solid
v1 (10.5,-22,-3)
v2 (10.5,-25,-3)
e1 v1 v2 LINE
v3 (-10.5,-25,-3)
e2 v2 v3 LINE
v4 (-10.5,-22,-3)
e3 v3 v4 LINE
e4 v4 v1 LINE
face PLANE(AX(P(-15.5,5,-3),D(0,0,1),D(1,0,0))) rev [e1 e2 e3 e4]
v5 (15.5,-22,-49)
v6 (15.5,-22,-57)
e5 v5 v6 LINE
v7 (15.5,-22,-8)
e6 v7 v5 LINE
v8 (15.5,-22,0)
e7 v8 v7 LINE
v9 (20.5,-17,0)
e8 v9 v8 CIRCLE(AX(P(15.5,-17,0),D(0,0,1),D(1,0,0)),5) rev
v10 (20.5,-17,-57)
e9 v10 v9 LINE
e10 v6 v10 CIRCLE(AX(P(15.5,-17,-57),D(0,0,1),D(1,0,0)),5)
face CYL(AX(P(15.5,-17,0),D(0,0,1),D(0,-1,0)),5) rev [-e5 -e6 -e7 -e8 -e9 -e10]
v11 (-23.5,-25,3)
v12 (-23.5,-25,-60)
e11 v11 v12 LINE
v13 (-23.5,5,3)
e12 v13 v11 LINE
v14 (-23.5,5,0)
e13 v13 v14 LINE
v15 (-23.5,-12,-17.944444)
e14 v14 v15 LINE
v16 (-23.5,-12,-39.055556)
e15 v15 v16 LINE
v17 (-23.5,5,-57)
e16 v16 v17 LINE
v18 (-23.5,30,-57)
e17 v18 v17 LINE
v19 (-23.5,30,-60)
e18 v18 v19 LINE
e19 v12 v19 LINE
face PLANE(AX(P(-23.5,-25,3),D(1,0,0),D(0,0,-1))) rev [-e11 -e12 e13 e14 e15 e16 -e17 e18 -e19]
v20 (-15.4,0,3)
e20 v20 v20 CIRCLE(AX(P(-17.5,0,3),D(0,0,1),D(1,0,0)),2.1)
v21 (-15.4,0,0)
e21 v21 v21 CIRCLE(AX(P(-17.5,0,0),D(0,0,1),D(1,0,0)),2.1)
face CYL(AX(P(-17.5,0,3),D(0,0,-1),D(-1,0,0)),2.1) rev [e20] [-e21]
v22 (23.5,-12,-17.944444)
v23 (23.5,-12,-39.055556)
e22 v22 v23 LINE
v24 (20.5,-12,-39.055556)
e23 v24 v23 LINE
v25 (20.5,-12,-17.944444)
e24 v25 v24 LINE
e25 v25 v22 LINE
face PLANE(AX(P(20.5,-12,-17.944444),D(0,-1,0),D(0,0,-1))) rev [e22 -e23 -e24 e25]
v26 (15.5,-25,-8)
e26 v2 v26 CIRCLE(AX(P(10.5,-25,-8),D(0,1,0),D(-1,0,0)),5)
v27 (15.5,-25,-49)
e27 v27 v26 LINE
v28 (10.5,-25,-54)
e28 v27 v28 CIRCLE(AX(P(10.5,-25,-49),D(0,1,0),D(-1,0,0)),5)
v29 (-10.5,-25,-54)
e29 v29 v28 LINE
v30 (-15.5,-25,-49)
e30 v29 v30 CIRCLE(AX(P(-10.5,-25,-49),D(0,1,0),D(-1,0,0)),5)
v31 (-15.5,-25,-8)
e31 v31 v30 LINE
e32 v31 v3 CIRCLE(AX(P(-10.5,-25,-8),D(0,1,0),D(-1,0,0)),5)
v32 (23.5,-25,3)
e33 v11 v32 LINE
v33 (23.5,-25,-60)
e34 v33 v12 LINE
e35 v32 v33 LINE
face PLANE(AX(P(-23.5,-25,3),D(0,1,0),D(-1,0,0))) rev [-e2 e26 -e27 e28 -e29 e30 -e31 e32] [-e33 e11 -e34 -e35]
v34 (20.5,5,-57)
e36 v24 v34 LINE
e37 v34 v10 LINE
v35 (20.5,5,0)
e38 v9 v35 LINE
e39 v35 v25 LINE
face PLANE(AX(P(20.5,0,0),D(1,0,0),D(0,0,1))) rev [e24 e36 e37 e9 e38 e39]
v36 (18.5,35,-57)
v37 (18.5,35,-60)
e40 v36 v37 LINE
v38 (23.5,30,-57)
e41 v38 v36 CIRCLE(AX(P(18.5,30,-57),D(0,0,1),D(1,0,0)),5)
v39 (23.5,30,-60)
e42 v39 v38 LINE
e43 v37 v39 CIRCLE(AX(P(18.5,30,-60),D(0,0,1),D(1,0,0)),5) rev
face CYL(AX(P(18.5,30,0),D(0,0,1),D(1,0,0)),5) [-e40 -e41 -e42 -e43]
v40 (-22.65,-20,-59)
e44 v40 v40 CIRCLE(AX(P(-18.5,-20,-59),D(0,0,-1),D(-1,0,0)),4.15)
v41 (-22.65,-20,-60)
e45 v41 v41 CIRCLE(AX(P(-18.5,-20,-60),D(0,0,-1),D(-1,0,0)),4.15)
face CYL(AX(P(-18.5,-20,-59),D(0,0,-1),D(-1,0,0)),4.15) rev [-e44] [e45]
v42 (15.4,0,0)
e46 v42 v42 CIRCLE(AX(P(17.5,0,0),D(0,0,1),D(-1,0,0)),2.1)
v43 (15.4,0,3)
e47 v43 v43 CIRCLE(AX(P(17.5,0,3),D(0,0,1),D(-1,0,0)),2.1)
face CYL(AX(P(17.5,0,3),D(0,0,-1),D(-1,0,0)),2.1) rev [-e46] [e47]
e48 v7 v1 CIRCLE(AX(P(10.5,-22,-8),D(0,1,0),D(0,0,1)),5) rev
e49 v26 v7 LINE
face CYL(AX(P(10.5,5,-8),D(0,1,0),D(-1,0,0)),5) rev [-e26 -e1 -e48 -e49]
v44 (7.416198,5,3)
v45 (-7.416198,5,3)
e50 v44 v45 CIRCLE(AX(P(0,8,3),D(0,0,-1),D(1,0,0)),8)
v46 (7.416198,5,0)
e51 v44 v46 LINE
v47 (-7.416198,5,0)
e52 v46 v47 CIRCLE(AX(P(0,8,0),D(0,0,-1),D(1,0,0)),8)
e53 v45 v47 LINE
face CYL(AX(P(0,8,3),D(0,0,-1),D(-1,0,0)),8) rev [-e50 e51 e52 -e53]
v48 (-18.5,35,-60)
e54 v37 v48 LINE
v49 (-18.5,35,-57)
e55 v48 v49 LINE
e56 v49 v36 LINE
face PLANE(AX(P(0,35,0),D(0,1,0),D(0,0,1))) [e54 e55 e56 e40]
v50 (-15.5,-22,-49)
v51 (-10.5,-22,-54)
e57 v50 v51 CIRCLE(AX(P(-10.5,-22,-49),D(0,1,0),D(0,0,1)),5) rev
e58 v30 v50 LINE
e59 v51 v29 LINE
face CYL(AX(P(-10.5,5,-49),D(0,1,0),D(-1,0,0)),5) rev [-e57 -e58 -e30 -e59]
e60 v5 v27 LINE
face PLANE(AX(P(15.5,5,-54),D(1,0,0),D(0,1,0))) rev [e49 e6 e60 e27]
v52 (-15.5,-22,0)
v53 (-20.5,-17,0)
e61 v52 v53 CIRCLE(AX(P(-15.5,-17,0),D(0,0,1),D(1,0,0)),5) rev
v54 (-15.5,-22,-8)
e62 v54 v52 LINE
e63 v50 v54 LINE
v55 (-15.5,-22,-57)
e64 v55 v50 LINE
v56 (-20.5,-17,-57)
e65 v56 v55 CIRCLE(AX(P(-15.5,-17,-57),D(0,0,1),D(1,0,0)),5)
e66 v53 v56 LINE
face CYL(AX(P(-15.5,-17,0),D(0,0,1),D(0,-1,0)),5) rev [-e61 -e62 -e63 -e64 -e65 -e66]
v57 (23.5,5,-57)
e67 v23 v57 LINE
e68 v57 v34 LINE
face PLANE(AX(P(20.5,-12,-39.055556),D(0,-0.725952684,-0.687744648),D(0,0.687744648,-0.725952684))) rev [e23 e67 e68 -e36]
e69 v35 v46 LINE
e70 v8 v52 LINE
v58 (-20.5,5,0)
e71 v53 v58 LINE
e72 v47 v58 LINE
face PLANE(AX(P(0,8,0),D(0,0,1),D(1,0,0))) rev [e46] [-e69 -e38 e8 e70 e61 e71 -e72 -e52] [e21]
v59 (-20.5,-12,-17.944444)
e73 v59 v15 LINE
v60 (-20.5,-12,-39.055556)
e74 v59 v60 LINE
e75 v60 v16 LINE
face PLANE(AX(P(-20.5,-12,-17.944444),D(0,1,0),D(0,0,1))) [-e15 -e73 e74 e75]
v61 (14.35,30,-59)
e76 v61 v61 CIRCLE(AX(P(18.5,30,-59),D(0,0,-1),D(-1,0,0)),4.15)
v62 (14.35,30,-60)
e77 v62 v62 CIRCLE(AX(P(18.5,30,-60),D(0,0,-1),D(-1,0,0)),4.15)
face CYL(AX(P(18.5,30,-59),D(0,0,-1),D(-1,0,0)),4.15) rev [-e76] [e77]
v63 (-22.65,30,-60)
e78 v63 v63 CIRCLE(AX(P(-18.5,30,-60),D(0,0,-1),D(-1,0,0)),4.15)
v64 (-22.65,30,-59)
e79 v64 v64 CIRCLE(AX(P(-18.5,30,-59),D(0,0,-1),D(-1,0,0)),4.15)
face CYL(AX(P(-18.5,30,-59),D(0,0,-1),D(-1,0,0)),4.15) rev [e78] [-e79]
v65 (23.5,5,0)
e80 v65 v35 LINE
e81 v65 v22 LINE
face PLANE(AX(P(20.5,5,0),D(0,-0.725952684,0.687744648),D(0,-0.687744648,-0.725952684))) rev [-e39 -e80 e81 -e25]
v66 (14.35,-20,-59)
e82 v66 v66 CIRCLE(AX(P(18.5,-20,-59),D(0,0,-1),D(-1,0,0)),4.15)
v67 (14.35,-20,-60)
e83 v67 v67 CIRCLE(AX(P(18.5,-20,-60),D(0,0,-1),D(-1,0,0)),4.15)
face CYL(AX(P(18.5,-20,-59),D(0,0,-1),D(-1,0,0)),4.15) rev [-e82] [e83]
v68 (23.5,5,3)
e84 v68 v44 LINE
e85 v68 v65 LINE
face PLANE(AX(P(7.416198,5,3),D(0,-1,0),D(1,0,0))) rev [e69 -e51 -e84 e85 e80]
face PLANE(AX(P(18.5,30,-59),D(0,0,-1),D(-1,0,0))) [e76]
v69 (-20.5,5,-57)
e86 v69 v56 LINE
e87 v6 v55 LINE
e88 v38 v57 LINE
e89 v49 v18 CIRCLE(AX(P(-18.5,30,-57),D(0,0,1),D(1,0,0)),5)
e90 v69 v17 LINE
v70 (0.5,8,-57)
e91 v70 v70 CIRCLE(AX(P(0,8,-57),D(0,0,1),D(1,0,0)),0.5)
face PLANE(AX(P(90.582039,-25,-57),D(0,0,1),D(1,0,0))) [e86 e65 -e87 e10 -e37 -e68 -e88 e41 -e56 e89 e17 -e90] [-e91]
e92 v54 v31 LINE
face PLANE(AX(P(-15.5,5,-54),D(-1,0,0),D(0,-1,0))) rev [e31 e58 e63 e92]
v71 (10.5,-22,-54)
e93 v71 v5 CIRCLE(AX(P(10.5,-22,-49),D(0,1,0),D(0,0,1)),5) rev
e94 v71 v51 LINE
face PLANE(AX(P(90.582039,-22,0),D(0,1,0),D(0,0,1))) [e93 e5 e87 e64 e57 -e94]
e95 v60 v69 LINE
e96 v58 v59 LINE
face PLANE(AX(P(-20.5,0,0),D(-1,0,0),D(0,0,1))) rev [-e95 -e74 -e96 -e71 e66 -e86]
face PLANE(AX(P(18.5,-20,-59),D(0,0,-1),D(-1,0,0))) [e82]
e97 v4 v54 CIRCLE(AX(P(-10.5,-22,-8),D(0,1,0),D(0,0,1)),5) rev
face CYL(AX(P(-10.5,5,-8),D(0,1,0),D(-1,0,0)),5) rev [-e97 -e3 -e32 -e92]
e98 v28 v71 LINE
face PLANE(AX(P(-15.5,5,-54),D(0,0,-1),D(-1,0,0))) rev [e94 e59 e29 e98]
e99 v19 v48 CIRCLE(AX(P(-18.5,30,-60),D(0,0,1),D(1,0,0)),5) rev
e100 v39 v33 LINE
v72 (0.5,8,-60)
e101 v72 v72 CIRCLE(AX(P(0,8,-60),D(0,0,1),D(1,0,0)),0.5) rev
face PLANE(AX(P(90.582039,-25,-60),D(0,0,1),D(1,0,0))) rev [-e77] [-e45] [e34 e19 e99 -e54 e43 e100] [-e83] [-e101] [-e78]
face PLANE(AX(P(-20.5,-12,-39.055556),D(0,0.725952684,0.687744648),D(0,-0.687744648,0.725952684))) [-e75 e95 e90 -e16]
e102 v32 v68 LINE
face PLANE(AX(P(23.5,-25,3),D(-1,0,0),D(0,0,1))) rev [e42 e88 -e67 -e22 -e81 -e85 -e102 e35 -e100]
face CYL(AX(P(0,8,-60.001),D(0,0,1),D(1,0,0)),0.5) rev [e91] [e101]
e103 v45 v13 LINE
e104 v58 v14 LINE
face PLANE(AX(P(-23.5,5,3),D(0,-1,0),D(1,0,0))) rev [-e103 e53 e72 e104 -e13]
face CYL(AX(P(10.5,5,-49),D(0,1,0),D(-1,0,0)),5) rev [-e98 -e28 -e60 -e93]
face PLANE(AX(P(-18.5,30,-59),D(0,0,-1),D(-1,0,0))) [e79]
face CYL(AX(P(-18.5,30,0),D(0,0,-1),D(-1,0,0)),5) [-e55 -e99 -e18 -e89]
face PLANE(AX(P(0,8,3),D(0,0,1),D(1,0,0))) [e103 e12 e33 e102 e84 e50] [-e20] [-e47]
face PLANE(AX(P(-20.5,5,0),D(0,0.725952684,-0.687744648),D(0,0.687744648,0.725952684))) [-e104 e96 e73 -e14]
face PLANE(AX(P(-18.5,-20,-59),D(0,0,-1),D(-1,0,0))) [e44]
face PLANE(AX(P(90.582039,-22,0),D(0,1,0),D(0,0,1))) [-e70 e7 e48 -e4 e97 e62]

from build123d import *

# Parameters (mm, degrees)
SKETCH1_R           = 2.1
BOSS_EXTRUDE1_DEPTH = 3
EXTRUDE_THIN1_DEPTH = 47
BOSS_EXTRUDE2_DEPTH = 3
SKETCH4_W           = 31
SKETCH4_H           = 51
CUT_EXTRUDE1_DEPTH  = 72.0791812
FILLET3_R           = 5
BOSS_EXTRUDE3_DEPTH = 30
FILLET1_R           = 5
CUT_EXTRUDE3_REACH  = 75.33
SKETCH10_R          = 0.5
SKETCH11_R          = 4.15
CUT_EXTRUDE4_DEPTH  = 1
FILLET2_R           = 5


with BuildPart() as part:
    # Sketch1 → Boss-Extrude1 (new body)
    with BuildSketch(Plane.XY):
        with BuildLine():
            Line((7.416198487, 5), (23.5, 5))
            Line((23.5, 5), (23.5, -25))
            Line((23.5, -25), (-23.5, -25))
            Line((-23.5, -25), (-23.5, 5))
            Line((-23.5, 5), (-7.416198487, 5))
            ThreePointArc((-7.416198487, 5), (0, 0), (7.416198487, 5))
        make_face()
        with Locations((-17.5, 0)):
            Circle(SKETCH1_R, mode=Mode.SUBTRACT)
        with Locations(Location((17.5, 0, 0), (0, 0, 180))):
            Circle(SKETCH1_R, mode=Mode.SUBTRACT)
    extrude(amount=BOSS_EXTRUDE1_DEPTH)

    # Sketch2 → Extrude-Thin1 (add)
    with BuildSketch(Plane.ZY.offset(23.5)):
        Polygon((0, -25), (-60, -25), (-60, 5), (-57, 5), (-57, -22), (0, -22), align=None)
    extrude(amount=-EXTRUDE_THIN1_DEPTH)

    # Sketch3 → Boss-Extrude2 (add)
    with BuildSketch(Plane.ZY.offset(23.5)):
        Polygon((-57, 5), (-57, -22), (0, -22), (0, 5), (-17.944444444, -12), (-39.055555556, -12), align=None)
    boss_extrude2 = extrude(amount=-BOSS_EXTRUDE2_DEPTH)

    # Mirror1: Boss-Extrude2 across plane
    add(boss_extrude2.mirror(Plane(origin=(0, 0, 0), x_dir=(0, 0, 1), z_dir=(1, 0, 0))))

    # Sketch4 → Cut-Extrude1 (cut, through all)
    with BuildSketch(Plane.XZ.offset(25)):
        with Locations((0, -28.5)):
            Rectangle(SKETCH4_W, SKETCH4_H)
    extrude(amount=-CUT_EXTRUDE1_DEPTH, mode=Mode.SUBTRACT)

    # Fillet3
    fillet3_edges = [part.edges().sort_by_distance(p)[0] for p in [
        (15.5, -23.5, -3),
        (15.5, -23.5, -54),
        (-15.5, -23.5, -54),
        (-15.5, -23.5, -3),
    ]]
    fillet(fillet3_edges, radius=FILLET3_R)

    # Sketch6 → Boss-Extrude3 (add)
    with BuildSketch(Plane(origin=(0, 5, 0), x_dir=(1, 0, 0), z_dir=(0, 1, 0))):
        Polygon((20.5, 57), (23.5, 57), (23.5, 60), (-23.5, 60), (-23.5, 57), (-20.5, 57), align=None)
    extrude(amount=BOSS_EXTRUDE3_DEPTH)

    # Fillet1
    fillet1_edges = [part.edges().sort_by_distance(p)[0] for p in [
        (-20.5, -22, -28.5),
        (20.5, -22, -28.5),
    ]]
    fillet(fillet1_edges, radius=FILLET1_R - 0.0001)  # a hair under: the kernel refuses the full size

    # Sketch10 → Cut-Extrude3 (cut, up to next)
    with BuildSketch(Plane.XY.offset(-57), mode=Mode.PRIVATE) as cut_extrude3_sk1:
        with Locations((0, 8)):
            Circle(SKETCH10_R)
    cut_extrude3_tool1 = extrude(cut_extrude3_sk1.sketch, amount=-CUT_EXTRUDE3_REACH, mode=Mode.PRIVATE) & part.part
    add(cut_extrude3_tool1.solids().sort_by_distance((0, 8, -57))[0], mode=Mode.SUBTRACT)

    # Sketch11 → Cut-Extrude4 (cut)
    with BuildSketch(Plane(origin=(0, 0, -60), x_dir=(-1, 0, 0), z_dir=(0, 0, -1))):
        with Locations((-18.5, 30)):
            Circle(SKETCH11_R)
        with Locations((18.5, 30)):
            Circle(SKETCH11_R)
        with Locations((-18.5, -20)):
            Circle(SKETCH11_R)
        with Locations((18.5, -20)):
            Circle(SKETCH11_R)
    extrude(amount=-CUT_EXTRUDE4_DEPTH, mode=Mode.SUBTRACT)

    # Fillet2
    fillet2_edges = [part.edges().sort_by_distance(p)[0] for p in [
        (23.5, 35, -58.5),
        (-23.5, 35, -58.5),
    ]]
    fillet(fillet2_edges, radius=FILLET2_R)


solid = part.part
